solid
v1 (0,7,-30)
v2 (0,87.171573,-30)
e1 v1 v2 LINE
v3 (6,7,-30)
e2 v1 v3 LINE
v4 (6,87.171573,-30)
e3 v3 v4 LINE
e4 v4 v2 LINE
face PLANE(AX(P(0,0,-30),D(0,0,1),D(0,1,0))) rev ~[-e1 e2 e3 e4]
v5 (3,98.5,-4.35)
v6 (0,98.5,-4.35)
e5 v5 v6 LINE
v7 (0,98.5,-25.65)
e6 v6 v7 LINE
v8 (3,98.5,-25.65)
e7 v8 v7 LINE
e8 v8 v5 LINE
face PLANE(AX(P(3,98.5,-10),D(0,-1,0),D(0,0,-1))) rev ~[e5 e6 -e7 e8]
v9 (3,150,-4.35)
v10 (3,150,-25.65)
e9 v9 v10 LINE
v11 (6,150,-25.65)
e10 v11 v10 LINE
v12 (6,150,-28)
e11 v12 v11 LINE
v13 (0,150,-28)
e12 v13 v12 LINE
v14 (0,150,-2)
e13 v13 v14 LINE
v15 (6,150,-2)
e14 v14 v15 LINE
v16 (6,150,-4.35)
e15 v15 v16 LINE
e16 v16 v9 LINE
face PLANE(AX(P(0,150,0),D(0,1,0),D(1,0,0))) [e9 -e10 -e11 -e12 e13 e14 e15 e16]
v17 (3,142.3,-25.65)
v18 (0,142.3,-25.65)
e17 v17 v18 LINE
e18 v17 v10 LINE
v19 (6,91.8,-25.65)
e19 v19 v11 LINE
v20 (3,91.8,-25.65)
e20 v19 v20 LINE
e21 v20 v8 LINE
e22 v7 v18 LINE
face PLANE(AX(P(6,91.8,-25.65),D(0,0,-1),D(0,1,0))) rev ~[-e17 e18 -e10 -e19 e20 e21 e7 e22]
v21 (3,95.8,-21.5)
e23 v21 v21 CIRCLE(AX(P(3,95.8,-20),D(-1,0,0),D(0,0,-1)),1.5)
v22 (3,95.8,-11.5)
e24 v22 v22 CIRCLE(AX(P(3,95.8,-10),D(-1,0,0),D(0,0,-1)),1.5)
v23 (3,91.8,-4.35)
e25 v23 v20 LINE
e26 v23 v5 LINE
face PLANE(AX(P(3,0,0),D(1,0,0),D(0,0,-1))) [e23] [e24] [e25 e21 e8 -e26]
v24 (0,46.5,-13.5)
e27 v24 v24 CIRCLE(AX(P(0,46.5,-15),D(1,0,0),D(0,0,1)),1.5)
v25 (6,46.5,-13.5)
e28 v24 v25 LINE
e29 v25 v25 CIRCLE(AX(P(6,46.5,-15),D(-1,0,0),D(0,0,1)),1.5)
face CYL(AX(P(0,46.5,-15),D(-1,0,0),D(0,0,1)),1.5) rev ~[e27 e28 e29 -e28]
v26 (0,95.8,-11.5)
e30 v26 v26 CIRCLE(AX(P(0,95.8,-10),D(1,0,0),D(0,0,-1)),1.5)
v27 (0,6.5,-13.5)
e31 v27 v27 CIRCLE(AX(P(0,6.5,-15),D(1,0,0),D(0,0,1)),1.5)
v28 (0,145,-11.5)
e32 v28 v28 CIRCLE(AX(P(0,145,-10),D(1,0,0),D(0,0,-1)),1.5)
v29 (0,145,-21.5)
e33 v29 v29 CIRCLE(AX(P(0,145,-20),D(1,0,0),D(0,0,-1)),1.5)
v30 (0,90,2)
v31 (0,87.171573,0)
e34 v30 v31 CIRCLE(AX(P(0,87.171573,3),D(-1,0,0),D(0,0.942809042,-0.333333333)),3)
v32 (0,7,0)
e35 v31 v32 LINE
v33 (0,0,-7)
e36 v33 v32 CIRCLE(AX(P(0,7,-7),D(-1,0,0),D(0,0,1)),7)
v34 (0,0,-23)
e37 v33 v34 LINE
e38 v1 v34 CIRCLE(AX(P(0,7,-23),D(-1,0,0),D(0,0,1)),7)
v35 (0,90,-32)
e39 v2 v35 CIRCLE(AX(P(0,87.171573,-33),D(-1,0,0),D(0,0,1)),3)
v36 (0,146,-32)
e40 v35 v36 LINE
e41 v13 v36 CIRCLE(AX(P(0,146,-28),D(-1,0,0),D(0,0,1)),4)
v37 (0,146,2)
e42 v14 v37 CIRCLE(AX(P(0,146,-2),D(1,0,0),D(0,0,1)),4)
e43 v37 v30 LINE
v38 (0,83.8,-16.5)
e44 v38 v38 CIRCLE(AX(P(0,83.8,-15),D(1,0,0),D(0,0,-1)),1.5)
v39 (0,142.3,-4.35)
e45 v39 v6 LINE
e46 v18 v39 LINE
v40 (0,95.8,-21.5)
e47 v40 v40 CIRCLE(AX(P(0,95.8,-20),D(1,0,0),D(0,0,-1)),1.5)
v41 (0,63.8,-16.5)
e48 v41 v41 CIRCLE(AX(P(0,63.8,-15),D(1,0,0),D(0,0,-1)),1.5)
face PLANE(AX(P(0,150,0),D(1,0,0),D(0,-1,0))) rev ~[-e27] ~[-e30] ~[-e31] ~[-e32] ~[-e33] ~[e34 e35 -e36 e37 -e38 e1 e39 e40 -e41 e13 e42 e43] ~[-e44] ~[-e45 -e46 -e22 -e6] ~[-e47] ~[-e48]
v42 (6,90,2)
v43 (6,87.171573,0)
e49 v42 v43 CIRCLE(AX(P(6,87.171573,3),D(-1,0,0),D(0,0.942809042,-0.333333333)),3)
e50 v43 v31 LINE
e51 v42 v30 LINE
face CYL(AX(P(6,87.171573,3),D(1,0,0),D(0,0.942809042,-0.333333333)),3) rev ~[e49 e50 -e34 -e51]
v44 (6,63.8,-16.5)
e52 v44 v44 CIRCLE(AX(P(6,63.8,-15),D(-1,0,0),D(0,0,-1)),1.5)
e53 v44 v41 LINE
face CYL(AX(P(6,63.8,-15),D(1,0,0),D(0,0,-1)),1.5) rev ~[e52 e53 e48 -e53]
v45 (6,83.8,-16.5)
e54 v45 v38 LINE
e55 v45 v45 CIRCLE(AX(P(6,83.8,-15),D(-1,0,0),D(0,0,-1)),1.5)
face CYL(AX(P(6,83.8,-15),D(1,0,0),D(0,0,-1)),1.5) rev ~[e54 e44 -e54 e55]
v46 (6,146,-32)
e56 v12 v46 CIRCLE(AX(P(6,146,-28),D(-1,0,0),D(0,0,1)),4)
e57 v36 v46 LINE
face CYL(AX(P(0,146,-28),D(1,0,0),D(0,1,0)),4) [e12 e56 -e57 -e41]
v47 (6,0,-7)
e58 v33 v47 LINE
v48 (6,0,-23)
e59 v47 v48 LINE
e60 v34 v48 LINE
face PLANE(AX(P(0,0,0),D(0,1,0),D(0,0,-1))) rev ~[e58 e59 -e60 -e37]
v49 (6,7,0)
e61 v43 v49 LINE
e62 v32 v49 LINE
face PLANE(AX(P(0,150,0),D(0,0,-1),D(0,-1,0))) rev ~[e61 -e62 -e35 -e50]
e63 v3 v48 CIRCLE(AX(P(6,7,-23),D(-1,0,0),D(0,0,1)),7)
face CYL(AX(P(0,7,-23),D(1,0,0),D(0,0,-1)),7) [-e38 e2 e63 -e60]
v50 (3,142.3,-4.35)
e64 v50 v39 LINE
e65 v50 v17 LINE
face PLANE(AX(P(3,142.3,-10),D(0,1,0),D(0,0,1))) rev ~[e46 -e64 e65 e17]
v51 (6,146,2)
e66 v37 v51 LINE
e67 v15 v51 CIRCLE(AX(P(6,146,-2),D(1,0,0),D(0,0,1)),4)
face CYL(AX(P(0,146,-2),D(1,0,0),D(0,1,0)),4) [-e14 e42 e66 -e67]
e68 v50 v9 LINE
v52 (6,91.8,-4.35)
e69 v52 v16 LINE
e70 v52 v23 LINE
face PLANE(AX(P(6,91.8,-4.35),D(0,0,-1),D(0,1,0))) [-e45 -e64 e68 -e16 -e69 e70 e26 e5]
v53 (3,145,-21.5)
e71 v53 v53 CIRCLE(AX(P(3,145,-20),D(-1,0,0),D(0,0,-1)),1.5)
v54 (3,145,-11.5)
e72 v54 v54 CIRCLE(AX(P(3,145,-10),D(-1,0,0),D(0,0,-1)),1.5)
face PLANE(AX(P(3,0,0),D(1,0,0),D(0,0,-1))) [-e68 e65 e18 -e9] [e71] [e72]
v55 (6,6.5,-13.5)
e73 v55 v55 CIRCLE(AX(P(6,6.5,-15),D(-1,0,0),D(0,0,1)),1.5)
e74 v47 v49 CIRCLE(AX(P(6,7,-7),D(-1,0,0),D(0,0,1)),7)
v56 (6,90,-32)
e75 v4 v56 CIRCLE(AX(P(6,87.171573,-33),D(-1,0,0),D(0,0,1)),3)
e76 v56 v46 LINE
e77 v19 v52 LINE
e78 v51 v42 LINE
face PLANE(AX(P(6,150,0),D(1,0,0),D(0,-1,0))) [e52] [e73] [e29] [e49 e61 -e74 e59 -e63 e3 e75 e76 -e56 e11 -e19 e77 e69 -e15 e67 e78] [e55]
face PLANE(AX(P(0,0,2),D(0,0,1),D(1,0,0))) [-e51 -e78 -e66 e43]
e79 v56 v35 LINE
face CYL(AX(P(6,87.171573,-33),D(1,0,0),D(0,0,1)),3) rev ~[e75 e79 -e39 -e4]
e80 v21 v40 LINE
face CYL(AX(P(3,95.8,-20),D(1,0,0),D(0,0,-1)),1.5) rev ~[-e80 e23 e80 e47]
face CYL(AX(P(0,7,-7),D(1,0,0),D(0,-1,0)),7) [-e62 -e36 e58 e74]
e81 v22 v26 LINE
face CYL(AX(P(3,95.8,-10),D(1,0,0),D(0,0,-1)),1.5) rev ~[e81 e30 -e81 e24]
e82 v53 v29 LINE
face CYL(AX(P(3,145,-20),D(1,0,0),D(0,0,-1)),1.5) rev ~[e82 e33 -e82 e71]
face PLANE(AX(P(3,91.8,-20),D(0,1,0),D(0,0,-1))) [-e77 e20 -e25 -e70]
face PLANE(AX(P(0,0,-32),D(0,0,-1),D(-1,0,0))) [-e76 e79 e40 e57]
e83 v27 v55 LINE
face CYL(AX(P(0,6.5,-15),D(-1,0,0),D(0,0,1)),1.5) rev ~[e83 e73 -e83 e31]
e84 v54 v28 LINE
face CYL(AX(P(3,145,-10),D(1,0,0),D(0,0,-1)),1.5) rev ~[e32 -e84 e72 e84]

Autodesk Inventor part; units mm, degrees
ref_plane "YZ Plane" through (0, 0, 0) normal (1, 0, 0) x (0, 1, 0)
ref_plane "XZ Plane" through (0, 0, 0) normal (0, 1, 0) x (-1, 0, 0)
ref_plane "XY Plane" through (0, 0, 0) normal (0, 0, 1) x (1, 0, 0)
sketch "Sketch1" plane through (0, 0, 0) normal (1, 0, 0) x (0, 1, 0)
  line L0 (0, 0) -> (0, -30)
  line L1 (0, -30) -> (150, -30)
  line L2 (150, -30) -> (150, 0)
  line L3 (150, 0) -> (0, 0)
  dimension "d0" = 30
  dimension "d1" = 150
extrude "Extrusion1" add sketch "Sketch1" along normal blind 3
sketch "Sketch2" plane through (3, 0, 0) normal (1, 0, 0) x (0, 0, -1)
  line L0 (30, 0) -> (30, 150) projected
  line L1 (30, 150) -> (0, 150) projected
  line L2 (0, 150) -> (0, 0) projected
  line L3 (0, 0) -> (30, 0) projected
  line L4 (30, 150) -> (0, 150) projected
  line L5 (0, 150) -> (0, 145)
  line L6 (0, 150) -> (0, 0) projected
  line L7 (0, 145) -> (30, 145)
  line L8 (30, 0) -> (30, 150) projected
  line L9 (0, 145) -> (15, 145)
  line L10 (15, 145) -> (20, 145)
  line L11 (15, 145) -> (10, 145)
  circle A0 centre (10, 145) radius 1.5
  circle A1 centre (20, 145) radius 1.5
  circle A2 centre (20, 95.8) radius 1.5
  circle A3 centre (10, 95.8) radius 1.5
  line L12 (20, 95.8) -> (20, 97.3)
  line L13 (20, 143.5) -> (20, 145)
  line L14 (10, 95.8) -> (11.5, 95.8)
  line L15 (18.5, 95.8) -> (20, 95.8)
  line L16 (10, 145) -> (10, 143.5)
  line L17 (10, 97.3) -> (10, 95.8)
  line L18 (15, 145) -> (15, 120.4)
  line L19 (15, 120.4) -> (15, 140.9)
  line L20 (15, 140.9) -> (25.15, 140.9)
  line L21 (25.15, 140.9) -> (25.15, 99.9)
  line L22 (25.15, 99.9) -> (4.85, 99.9)
  line L23 (4.85, 99.9) -> (4.85, 140.9)
  line L24 (4.85, 140.9) -> (15, 140.9)
  dimension "d8" = 3
  dimension "d9" = 3
  dimension "d4" = 5
  dimension "d5" = 15
  dimension "d6" = 5
  dimension "d7" = 5
  dimension "d10" = 49.2
  dimension "d11" = 3
  dimension "d12" = 3
  dimension "d15" = 24.6
  dimension "d16" = 20.5
  dimension "d17" = 10.15
  dimension "d18" = 41
  dimension "d19" = 20.3
extrude "Extrusion2" cut sketch "Sketch2" against normal through all contours A1 L13 L7 | L7 A1 | L13 A1 L7 | A0 L7 | L7 L16 A0 | L7 A0 L16 | A2 L15 L12 | L12 L15 A2 | L14 L17 A3 | A3 L17 L14 | L20 L21 L22 L23 L24
sketch "Sketch3" plane through (3, 0, 0) normal (1, 0, 0) x (0, 0, -1)
  circle A0 centre (20, 145) radius 1.5 projected
  circle A1 centre (10, 95.8) radius 1.5 projected
  circle A2 centre (10, 145) radius 1.5 projected
  circle A3 centre (20, 95.8) radius 1.5 projected
  line L0 (25.15, 140.9) -> (25.15, 99.9) projected
  line L1 (25.15, 99.9) -> (4.85, 99.9) projected
  line L2 (4.85, 99.9) -> (4.85, 140.9) projected
  line L3 (4.85, 140.9) -> (25.15, 140.9) projected
  line L4 (30, 0) -> (30, 150) projected
  line L5 (30, 150) -> (0, 150) projected
  line L6 (0, 150) -> (0, 0) projected
  line L7 (0, 0) -> (30, 0) projected
  line L8 (20, 95.8) -> (15, 95.8)
  line L9 (15, 95.8) -> (15, 85.8)
  circle A4 centre (15, 85.8) radius 1.5
  line L10 (15, 85.8) -> (15, 65.8)
  circle A5 centre (15, 65.8) radius 1.5
  line L11 (20, 95.8) -> (20, 91.8)
  line L12 (20, 91.8) -> (25.15, 91.8)
  line L13 (25.15, 91.8) -> (25.15, 99.9)
  line L14 (20, 91.8) -> (4.85, 91.8)
  line L15 (25.15, 99.9) -> (4.85, 99.9) projected
  line L16 (4.85, 91.8) -> (4.85, 99.9)
  line L17 (25.15, 99.9) -> (25.15, 150)
  line L18 (30, 150) -> (0, 150) projected
  line L19 (4.85, 99.9) -> (4.85, 150)
  dimension "d22" = 5
  dimension "d23" = 10
  dimension "d24" = 3
  dimension "d34" = 20
  dimension "d35" = 3
  dimension "d41" = 4
extrude "Extrusion7" add sketch "Sketch3" along normal blind 3 contours L12 L13 L0 L17 L5 L4 L7 L6 L19 L2 L16 L14 | A4 L10 L9 | L9 L10 A4 | A5
sketch "Sketch5" plane through (0, 0, 0) normal (-1, 0, 0) x (0, 0, 1)
  circle A0 centre (-20, 145) radius 1.5 projected
  circle A1 centre (-10, 95.8) radius 1.5 projected
  circle A2 centre (-10, 145) radius 1.5 projected
  circle A3 centre (-20, 95.8) radius 1.5 projected
  line L0 (-25.15, 99.9) -> (-25.15, 140.9) projected
  line L1 (-25.15, 140.9) -> (-4.85, 140.9) projected
  line L2 (-4.85, 140.9) -> (-4.85, 99.9) projected
  line L3 (-4.85, 99.9) -> (-25.15, 99.9) projected
  line L4 (-30, 0) -> (-30, 150) projected
  line L5 (0, 0) -> (-30, 0) projected
  line L6 (0, 150) -> (0, 0) projected
  line L7 (-30, 150) -> (0, 150) projected
  line L8 (0, 146) -> (0, 0) projected
  line L9 (0, 0) -> (-15, 0)
  line L10 (0, 0) -> (-30, 0) projected
  line L11 (-15, 0) -> (-15, 6.5)
  circle A4 centre (-15, 6.5) radius 1.5
  line L12 (-15, 6.5) -> (-15, 46.5)
  circle A5 centre (-15, 46.5) radius 1.5
  dimension "d45" = 15
  dimension "d46" = 6.5
  dimension "d47" = 3
  dimension "d48" = 40
  dimension "d49" = 3
extrude "Extrusion8" cut sketch "Sketch5" against normal blind 10 contours A4 L12 L11 | L11 L12 A4 | A5
sketch "Sketch6" plane through (6, 0, 0) normal (1, 0, 0) x (0, 0, -1)
  circle A0 centre (15, 6.5) radius 1.5 projected
  circle A1 centre (15, 46.5) radius 1.5 projected
  line L0 (30, 150) -> (25.15, 150) projected
  line L1 (25.15, 150) -> (25.15, 91.8) projected
  line L2 (25.15, 91.8) -> (4.85, 91.8) projected
  line L3 (4.85, 91.8) -> (4.85, 150) projected
  line L4 (4.85, 150) -> (0, 150) projected
  line L5 (0, 150) -> (0, 0) projected
  line L6 (0, 0) -> (30, 0) projected
  line L7 (30, 0) -> (30, 150) projected
  line L8 (25.15, 91.8) -> (25.15, 99.9) projected
  line L9 (25.15, 99.9) -> (4.85, 99.9) projected
  line L10 (4.85, 99.9) -> (4.85, 91.8) projected
  line L11 (4.85, 91.8) -> (25.15, 91.8) projected
  circle A2 centre (10, 95.8) radius 1.5 projected
  circle A3 centre (20, 95.8) radius 1.5 projected
  circle A4 centre (20, 95.8) radius 1.5 projected
  line L12 (20, 95.8) -> (15, 95.8)
  line L13 (15, 95.8) -> (15, 91.8)
  line L14 (25.15, 91.8) -> (4.85, 91.8) projected
  line L15 (15, 91.8) -> (15, 88.8)
  line L16 (15, 88.8) -> (15, 83.8)
  line L17 (15, 83.8) -> (15, 63.8)
  circle A5 centre (15, 63.8) radius 1.5
  circle A6 centre (15, 83.8) radius 1.5
  dimension "d52" = 5
  dimension "d53" = 3
  dimension "d54" = 5
  dimension "d55" = 20
  dimension "d56" = 3
  dimension "d57" = 3
extrude "Extrusion9" cut sketch "Sketch6" against normal blind 10 contours A6 L17 L16 | L16 L17 A6 | A5
sketch "Sketch8" plane through (6, 0, 0) normal (1, 0, 0) x (0, 0, -1)
  circle A0 centre (15, 63.8) radius 1.5 projected
  circle A1 centre (15, 83.8) radius 1.5 projected
  circle A2 centre (15, 6.5) radius 1.5 projected
  circle A3 centre (15, 46.5) radius 1.5 projected
  line L0 (30, 150) -> (25.15, 150) projected
  line L1 (25.15, 150) -> (25.15, 91.8) projected
  line L2 (25.15, 91.8) -> (4.85, 91.8) projected
  line L3 (4.85, 91.8) -> (4.85, 150) projected
  line L4 (4.85, 150) -> (0, 150) projected
  line L5 (0, 150) -> (0, 0) projected
  line L6 (0, 0) -> (30, 0) projected
  line L7 (30, 0) -> (30, 150) projected
  line L8 (4.85, 91.8) -> (25.15, 91.8) projected
  line L9 (25.15, 91.8) -> (25.65, 91.8)
  line L10 (25.65, 91.8) -> (25.65, 150)
  line L11 (26, 150) -> (4, 150) projected
  line L12 (4.85, 91.8) -> (4.35, 91.8)
  line L13 (4.35, 91.8) -> (4.35, 150)
  line L14 (4.85, 150) -> (4, 150) projected
  dimension "d60" = 0.5
  dimension "d61" = 0.5
extrude "Extrusion10" cut sketch "Sketch8" against normal blind 3 contours L10 L9 L1 L0 | L3 L12 L13 L4
sketch "Sketch9" plane through (3, 0, 0) normal (1, 0, 0) x (0, 0, -1)
  line L0 (4.35, 91.8) -> (25.65, 91.8) projected
  line L1 (25.65, 150) -> (25.65, 91.8) projected
  line L2 (25.65, 150) -> (4.35, 150) projected
  line L3 (4.35, 91.8) -> (4.35, 150) projected
  circle A0 centre (20, 145) radius 1.5 projected
  circle A1 centre (10, 145) radius 1.5 projected
  line L4 (4.85, 140.9) -> (4.85, 99.9) projected
  line L5 (4.85, 140.9) -> (25.15, 140.9) projected
  line L6 (25.15, 99.9) -> (25.15, 140.9) projected
  line L7 (25.15, 99.9) -> (4.85, 99.9) projected
  circle A2 centre (10, 95.8) radius 1.5 projected
  circle A3 centre (20, 95.8) radius 1.5 projected
  circle A4 centre (15, 46.5) radius 1.5 projected
  circle A5 centre (15, 6.5) radius 1.5 projected
  circle A6 centre (15, 83.8) radius 1.5 projected
  circle A7 centre (15, 63.8) radius 1.5 projected
  line L8 (25.65, 91.8) -> (4.35, 91.8) projected
  line L9 (4.35, 91.8) -> (4.35, 150) projected
  line L10 (4.35, 150) -> (0, 150) projected
  line L11 (0, 150) -> (0, 0) projected
  line L12 (0, 0) -> (30, 0) projected
  line L13 (30, 0) -> (30, 150) projected
  line L14 (30, 150) -> (25.65, 150) projected
  line L15 (25.65, 150) -> (25.65, 91.8) projected
  line L16 (4.85, 140.9) -> (25.15, 140.9) projected
  line L17 (4.85, 140.9) -> (4.35, 140.9)
  line L18 (25.15, 99.9) -> (25.15, 140.9) projected
  line L19 (25.15, 140.9) -> (25.65, 140.9)
  line L20 (25.65, 150) -> (25.65, 91.8) projected
  line L21 (25.15, 99.9) -> (4.85, 99.9) projected
  line L22 (25.15, 99.9) -> (25.65, 99.9)
  line L23 (4.85, 99.9) -> (4.35, 99.9)
extrude "Extrusion11" cut sketch "Sketch9" against normal blind 3 contours L3 L17 L4 L23 | L22 L6 L19 L1
sketch "Sketch10" plane through (3, 0, 0) normal (1, 0, 0) x (0, 0, -1)
  line L0 (4.35, 140.9) -> (25.65, 140.9) projected
  line L1 (25.65, 150) -> (25.65, 140.9) projected
  line L2 (25.65, 150) -> (4.35, 150) projected
  line L3 (4.35, 140.9) -> (4.35, 150) projected
  circle A0 centre (10, 145) radius 1.5 projected
  circle A1 centre (20, 145) radius 1.5 projected
  line L4 (25.65, 99.9) -> (4.35, 99.9) projected
  line L5 (4.35, 91.8) -> (4.35, 99.9) projected
  line L6 (4.35, 91.8) -> (25.65, 91.8) projected
  line L7 (25.65, 99.9) -> (25.65, 91.8) projected
  circle A2 centre (10, 95.8) radius 1.5 projected
  circle A3 centre (20, 95.8) radius 1.5 projected
  line L8 (4.35, 140.9) -> (4.35, 141.9)
  line L9 (4.35, 91.8) -> (4.35, 150) projected
  line L10 (25.65, 150) -> (25.65, 91.8) projected
  line L11 (25.65, 140.9) -> (25.65, 141.9)
  line L12 (4.35, 99.9) -> (4.35, 99.4)
  line L13 (4.35, 99.4) -> (25.65, 99.4)
  line L14 (25.65, 99.9) -> (25.65, 99.4)
  line L15 (4.35, 140.9) -> (4.35, 141.4)
  line L16 (4.35, 141.4) -> (25.65, 141.4)
  line L17 (25.65, 141.4) -> (25.65, 140.9)
  point P0 (0, 0)
  dimension "d67" = 0.5
  dimension "d68" = 0.5
extrude "Extrusion12" cut sketch "Sketch10" against normal blind 3 contours L3 L16 L1 L0 | L4 L7 L13 L5
sketch "Sketch11" plane through (3, 0, 0) normal (1, 0, 0) x (0, 0, -1)
  circle A0 centre (20, 145) radius 1.5 projected
  circle A1 centre (10, 145) radius 1.5 projected
  line L0 (4.35, 141.4) -> (25.65, 141.4) projected
  line L1 (25.65, 150) -> (25.65, 141.4) projected
  line L2 (25.65, 150) -> (4.35, 150) projected
  line L3 (4.35, 141.4) -> (4.35, 150) projected
  line L4 (25.65, 99.4) -> (4.35, 99.4) projected
  line L5 (4.35, 91.8) -> (4.35, 99.4) projected
  line L6 (4.35, 91.8) -> (25.65, 91.8) projected
  line L7 (25.65, 99.4) -> (25.65, 91.8) projected
  circle A2 centre (10, 95.8) radius 1.5 projected
  circle A3 centre (20, 95.8) radius 1.5 projected
  circle A4 centre (10, 95.8) radius 1.5 projected
  line L8 (10, 97.3) -> (10, 98.5)
  line L9 (10, 98.5) -> (25.65, 98.5)
  line L10 (25.65, 150) -> (25.65, 91.8) projected
  line L11 (10, 98.5) -> (4.35, 98.5)
  line L12 (4.35, 91.8) -> (4.35, 150) projected
  circle A5 centre (10, 145) radius 1.5 projected
  line L13 (10, 143.5) -> (10, 142.3)
  line L14 (10, 142.3) -> (25.65, 142.3)
  line L15 (10, 142.3) -> (4.35, 142.3)
  point P0 (0, 0)
  point P1 (4.35, 142.3)
  point P2 (4.35, 98.5)
  dimension "d71" = 1.2
  dimension "d72" = 1.2
extrude "Extrusion13" cut sketch "Sketch11" against normal blind 3 contours L3 L15 L14 L1 L0 | L4 L7 L9 L11 L5
sketch "Sketch12" plane through (0, 0, -30) normal (0, 0, -1) x (-1, 0, 0)
  line L0 (0, 0) -> (0, 150) projected
  line L1 (0, 150) -> (-6, 150) projected
  line L2 (-6, 0) -> (-6, 150) projected
  line L3 (0, 0) -> (-6, 0) projected
  line L4 (-6, 150) -> (-6, 90)
  line L5 (-6, 0) -> (-6, 150) projected
  line L6 (-6, 90) -> (0, 90)
  line L7 (0, 0) -> (0, 150) projected
  dimension "d75" = 60
extrude "Extrusion14" add sketch "Sketch12" along normal blind 2 contours L6 L2 L1 L0
sketch "Sketch13" plane through (0, 0, 0) normal (0, 0, 1) x (1, 0, 0)
  line L0 (0, 150) -> (0, 0) projected
  line L1 (0, 0) -> (6, 0) projected
  line L2 (6, 150) -> (6, 0) projected
  line L3 (0, 150) -> (6, 150) projected
  line L4 (6, 150) -> (6, 90) projected
  line L5 (6, 150) -> (6, 90)
  line L6 (6, 90) -> (0, 90)
  dimension "d78" = 60
extrude "Extrusion15" add sketch "Sketch13" along normal blind 2 contours L3 L2 L6 L0
fillet "Fillet3" radius 4 2 edges at (3, 150, 2) (3, 150, -32)
fillet "Fillet4" radius 3 2 edges at (3, 90, 0) (3, 90, -30)
fillet "Fillet5" radius 7 2 edges at (3, 0, -30) (3, 0, 0)
properties part number "antebrazo_1"
